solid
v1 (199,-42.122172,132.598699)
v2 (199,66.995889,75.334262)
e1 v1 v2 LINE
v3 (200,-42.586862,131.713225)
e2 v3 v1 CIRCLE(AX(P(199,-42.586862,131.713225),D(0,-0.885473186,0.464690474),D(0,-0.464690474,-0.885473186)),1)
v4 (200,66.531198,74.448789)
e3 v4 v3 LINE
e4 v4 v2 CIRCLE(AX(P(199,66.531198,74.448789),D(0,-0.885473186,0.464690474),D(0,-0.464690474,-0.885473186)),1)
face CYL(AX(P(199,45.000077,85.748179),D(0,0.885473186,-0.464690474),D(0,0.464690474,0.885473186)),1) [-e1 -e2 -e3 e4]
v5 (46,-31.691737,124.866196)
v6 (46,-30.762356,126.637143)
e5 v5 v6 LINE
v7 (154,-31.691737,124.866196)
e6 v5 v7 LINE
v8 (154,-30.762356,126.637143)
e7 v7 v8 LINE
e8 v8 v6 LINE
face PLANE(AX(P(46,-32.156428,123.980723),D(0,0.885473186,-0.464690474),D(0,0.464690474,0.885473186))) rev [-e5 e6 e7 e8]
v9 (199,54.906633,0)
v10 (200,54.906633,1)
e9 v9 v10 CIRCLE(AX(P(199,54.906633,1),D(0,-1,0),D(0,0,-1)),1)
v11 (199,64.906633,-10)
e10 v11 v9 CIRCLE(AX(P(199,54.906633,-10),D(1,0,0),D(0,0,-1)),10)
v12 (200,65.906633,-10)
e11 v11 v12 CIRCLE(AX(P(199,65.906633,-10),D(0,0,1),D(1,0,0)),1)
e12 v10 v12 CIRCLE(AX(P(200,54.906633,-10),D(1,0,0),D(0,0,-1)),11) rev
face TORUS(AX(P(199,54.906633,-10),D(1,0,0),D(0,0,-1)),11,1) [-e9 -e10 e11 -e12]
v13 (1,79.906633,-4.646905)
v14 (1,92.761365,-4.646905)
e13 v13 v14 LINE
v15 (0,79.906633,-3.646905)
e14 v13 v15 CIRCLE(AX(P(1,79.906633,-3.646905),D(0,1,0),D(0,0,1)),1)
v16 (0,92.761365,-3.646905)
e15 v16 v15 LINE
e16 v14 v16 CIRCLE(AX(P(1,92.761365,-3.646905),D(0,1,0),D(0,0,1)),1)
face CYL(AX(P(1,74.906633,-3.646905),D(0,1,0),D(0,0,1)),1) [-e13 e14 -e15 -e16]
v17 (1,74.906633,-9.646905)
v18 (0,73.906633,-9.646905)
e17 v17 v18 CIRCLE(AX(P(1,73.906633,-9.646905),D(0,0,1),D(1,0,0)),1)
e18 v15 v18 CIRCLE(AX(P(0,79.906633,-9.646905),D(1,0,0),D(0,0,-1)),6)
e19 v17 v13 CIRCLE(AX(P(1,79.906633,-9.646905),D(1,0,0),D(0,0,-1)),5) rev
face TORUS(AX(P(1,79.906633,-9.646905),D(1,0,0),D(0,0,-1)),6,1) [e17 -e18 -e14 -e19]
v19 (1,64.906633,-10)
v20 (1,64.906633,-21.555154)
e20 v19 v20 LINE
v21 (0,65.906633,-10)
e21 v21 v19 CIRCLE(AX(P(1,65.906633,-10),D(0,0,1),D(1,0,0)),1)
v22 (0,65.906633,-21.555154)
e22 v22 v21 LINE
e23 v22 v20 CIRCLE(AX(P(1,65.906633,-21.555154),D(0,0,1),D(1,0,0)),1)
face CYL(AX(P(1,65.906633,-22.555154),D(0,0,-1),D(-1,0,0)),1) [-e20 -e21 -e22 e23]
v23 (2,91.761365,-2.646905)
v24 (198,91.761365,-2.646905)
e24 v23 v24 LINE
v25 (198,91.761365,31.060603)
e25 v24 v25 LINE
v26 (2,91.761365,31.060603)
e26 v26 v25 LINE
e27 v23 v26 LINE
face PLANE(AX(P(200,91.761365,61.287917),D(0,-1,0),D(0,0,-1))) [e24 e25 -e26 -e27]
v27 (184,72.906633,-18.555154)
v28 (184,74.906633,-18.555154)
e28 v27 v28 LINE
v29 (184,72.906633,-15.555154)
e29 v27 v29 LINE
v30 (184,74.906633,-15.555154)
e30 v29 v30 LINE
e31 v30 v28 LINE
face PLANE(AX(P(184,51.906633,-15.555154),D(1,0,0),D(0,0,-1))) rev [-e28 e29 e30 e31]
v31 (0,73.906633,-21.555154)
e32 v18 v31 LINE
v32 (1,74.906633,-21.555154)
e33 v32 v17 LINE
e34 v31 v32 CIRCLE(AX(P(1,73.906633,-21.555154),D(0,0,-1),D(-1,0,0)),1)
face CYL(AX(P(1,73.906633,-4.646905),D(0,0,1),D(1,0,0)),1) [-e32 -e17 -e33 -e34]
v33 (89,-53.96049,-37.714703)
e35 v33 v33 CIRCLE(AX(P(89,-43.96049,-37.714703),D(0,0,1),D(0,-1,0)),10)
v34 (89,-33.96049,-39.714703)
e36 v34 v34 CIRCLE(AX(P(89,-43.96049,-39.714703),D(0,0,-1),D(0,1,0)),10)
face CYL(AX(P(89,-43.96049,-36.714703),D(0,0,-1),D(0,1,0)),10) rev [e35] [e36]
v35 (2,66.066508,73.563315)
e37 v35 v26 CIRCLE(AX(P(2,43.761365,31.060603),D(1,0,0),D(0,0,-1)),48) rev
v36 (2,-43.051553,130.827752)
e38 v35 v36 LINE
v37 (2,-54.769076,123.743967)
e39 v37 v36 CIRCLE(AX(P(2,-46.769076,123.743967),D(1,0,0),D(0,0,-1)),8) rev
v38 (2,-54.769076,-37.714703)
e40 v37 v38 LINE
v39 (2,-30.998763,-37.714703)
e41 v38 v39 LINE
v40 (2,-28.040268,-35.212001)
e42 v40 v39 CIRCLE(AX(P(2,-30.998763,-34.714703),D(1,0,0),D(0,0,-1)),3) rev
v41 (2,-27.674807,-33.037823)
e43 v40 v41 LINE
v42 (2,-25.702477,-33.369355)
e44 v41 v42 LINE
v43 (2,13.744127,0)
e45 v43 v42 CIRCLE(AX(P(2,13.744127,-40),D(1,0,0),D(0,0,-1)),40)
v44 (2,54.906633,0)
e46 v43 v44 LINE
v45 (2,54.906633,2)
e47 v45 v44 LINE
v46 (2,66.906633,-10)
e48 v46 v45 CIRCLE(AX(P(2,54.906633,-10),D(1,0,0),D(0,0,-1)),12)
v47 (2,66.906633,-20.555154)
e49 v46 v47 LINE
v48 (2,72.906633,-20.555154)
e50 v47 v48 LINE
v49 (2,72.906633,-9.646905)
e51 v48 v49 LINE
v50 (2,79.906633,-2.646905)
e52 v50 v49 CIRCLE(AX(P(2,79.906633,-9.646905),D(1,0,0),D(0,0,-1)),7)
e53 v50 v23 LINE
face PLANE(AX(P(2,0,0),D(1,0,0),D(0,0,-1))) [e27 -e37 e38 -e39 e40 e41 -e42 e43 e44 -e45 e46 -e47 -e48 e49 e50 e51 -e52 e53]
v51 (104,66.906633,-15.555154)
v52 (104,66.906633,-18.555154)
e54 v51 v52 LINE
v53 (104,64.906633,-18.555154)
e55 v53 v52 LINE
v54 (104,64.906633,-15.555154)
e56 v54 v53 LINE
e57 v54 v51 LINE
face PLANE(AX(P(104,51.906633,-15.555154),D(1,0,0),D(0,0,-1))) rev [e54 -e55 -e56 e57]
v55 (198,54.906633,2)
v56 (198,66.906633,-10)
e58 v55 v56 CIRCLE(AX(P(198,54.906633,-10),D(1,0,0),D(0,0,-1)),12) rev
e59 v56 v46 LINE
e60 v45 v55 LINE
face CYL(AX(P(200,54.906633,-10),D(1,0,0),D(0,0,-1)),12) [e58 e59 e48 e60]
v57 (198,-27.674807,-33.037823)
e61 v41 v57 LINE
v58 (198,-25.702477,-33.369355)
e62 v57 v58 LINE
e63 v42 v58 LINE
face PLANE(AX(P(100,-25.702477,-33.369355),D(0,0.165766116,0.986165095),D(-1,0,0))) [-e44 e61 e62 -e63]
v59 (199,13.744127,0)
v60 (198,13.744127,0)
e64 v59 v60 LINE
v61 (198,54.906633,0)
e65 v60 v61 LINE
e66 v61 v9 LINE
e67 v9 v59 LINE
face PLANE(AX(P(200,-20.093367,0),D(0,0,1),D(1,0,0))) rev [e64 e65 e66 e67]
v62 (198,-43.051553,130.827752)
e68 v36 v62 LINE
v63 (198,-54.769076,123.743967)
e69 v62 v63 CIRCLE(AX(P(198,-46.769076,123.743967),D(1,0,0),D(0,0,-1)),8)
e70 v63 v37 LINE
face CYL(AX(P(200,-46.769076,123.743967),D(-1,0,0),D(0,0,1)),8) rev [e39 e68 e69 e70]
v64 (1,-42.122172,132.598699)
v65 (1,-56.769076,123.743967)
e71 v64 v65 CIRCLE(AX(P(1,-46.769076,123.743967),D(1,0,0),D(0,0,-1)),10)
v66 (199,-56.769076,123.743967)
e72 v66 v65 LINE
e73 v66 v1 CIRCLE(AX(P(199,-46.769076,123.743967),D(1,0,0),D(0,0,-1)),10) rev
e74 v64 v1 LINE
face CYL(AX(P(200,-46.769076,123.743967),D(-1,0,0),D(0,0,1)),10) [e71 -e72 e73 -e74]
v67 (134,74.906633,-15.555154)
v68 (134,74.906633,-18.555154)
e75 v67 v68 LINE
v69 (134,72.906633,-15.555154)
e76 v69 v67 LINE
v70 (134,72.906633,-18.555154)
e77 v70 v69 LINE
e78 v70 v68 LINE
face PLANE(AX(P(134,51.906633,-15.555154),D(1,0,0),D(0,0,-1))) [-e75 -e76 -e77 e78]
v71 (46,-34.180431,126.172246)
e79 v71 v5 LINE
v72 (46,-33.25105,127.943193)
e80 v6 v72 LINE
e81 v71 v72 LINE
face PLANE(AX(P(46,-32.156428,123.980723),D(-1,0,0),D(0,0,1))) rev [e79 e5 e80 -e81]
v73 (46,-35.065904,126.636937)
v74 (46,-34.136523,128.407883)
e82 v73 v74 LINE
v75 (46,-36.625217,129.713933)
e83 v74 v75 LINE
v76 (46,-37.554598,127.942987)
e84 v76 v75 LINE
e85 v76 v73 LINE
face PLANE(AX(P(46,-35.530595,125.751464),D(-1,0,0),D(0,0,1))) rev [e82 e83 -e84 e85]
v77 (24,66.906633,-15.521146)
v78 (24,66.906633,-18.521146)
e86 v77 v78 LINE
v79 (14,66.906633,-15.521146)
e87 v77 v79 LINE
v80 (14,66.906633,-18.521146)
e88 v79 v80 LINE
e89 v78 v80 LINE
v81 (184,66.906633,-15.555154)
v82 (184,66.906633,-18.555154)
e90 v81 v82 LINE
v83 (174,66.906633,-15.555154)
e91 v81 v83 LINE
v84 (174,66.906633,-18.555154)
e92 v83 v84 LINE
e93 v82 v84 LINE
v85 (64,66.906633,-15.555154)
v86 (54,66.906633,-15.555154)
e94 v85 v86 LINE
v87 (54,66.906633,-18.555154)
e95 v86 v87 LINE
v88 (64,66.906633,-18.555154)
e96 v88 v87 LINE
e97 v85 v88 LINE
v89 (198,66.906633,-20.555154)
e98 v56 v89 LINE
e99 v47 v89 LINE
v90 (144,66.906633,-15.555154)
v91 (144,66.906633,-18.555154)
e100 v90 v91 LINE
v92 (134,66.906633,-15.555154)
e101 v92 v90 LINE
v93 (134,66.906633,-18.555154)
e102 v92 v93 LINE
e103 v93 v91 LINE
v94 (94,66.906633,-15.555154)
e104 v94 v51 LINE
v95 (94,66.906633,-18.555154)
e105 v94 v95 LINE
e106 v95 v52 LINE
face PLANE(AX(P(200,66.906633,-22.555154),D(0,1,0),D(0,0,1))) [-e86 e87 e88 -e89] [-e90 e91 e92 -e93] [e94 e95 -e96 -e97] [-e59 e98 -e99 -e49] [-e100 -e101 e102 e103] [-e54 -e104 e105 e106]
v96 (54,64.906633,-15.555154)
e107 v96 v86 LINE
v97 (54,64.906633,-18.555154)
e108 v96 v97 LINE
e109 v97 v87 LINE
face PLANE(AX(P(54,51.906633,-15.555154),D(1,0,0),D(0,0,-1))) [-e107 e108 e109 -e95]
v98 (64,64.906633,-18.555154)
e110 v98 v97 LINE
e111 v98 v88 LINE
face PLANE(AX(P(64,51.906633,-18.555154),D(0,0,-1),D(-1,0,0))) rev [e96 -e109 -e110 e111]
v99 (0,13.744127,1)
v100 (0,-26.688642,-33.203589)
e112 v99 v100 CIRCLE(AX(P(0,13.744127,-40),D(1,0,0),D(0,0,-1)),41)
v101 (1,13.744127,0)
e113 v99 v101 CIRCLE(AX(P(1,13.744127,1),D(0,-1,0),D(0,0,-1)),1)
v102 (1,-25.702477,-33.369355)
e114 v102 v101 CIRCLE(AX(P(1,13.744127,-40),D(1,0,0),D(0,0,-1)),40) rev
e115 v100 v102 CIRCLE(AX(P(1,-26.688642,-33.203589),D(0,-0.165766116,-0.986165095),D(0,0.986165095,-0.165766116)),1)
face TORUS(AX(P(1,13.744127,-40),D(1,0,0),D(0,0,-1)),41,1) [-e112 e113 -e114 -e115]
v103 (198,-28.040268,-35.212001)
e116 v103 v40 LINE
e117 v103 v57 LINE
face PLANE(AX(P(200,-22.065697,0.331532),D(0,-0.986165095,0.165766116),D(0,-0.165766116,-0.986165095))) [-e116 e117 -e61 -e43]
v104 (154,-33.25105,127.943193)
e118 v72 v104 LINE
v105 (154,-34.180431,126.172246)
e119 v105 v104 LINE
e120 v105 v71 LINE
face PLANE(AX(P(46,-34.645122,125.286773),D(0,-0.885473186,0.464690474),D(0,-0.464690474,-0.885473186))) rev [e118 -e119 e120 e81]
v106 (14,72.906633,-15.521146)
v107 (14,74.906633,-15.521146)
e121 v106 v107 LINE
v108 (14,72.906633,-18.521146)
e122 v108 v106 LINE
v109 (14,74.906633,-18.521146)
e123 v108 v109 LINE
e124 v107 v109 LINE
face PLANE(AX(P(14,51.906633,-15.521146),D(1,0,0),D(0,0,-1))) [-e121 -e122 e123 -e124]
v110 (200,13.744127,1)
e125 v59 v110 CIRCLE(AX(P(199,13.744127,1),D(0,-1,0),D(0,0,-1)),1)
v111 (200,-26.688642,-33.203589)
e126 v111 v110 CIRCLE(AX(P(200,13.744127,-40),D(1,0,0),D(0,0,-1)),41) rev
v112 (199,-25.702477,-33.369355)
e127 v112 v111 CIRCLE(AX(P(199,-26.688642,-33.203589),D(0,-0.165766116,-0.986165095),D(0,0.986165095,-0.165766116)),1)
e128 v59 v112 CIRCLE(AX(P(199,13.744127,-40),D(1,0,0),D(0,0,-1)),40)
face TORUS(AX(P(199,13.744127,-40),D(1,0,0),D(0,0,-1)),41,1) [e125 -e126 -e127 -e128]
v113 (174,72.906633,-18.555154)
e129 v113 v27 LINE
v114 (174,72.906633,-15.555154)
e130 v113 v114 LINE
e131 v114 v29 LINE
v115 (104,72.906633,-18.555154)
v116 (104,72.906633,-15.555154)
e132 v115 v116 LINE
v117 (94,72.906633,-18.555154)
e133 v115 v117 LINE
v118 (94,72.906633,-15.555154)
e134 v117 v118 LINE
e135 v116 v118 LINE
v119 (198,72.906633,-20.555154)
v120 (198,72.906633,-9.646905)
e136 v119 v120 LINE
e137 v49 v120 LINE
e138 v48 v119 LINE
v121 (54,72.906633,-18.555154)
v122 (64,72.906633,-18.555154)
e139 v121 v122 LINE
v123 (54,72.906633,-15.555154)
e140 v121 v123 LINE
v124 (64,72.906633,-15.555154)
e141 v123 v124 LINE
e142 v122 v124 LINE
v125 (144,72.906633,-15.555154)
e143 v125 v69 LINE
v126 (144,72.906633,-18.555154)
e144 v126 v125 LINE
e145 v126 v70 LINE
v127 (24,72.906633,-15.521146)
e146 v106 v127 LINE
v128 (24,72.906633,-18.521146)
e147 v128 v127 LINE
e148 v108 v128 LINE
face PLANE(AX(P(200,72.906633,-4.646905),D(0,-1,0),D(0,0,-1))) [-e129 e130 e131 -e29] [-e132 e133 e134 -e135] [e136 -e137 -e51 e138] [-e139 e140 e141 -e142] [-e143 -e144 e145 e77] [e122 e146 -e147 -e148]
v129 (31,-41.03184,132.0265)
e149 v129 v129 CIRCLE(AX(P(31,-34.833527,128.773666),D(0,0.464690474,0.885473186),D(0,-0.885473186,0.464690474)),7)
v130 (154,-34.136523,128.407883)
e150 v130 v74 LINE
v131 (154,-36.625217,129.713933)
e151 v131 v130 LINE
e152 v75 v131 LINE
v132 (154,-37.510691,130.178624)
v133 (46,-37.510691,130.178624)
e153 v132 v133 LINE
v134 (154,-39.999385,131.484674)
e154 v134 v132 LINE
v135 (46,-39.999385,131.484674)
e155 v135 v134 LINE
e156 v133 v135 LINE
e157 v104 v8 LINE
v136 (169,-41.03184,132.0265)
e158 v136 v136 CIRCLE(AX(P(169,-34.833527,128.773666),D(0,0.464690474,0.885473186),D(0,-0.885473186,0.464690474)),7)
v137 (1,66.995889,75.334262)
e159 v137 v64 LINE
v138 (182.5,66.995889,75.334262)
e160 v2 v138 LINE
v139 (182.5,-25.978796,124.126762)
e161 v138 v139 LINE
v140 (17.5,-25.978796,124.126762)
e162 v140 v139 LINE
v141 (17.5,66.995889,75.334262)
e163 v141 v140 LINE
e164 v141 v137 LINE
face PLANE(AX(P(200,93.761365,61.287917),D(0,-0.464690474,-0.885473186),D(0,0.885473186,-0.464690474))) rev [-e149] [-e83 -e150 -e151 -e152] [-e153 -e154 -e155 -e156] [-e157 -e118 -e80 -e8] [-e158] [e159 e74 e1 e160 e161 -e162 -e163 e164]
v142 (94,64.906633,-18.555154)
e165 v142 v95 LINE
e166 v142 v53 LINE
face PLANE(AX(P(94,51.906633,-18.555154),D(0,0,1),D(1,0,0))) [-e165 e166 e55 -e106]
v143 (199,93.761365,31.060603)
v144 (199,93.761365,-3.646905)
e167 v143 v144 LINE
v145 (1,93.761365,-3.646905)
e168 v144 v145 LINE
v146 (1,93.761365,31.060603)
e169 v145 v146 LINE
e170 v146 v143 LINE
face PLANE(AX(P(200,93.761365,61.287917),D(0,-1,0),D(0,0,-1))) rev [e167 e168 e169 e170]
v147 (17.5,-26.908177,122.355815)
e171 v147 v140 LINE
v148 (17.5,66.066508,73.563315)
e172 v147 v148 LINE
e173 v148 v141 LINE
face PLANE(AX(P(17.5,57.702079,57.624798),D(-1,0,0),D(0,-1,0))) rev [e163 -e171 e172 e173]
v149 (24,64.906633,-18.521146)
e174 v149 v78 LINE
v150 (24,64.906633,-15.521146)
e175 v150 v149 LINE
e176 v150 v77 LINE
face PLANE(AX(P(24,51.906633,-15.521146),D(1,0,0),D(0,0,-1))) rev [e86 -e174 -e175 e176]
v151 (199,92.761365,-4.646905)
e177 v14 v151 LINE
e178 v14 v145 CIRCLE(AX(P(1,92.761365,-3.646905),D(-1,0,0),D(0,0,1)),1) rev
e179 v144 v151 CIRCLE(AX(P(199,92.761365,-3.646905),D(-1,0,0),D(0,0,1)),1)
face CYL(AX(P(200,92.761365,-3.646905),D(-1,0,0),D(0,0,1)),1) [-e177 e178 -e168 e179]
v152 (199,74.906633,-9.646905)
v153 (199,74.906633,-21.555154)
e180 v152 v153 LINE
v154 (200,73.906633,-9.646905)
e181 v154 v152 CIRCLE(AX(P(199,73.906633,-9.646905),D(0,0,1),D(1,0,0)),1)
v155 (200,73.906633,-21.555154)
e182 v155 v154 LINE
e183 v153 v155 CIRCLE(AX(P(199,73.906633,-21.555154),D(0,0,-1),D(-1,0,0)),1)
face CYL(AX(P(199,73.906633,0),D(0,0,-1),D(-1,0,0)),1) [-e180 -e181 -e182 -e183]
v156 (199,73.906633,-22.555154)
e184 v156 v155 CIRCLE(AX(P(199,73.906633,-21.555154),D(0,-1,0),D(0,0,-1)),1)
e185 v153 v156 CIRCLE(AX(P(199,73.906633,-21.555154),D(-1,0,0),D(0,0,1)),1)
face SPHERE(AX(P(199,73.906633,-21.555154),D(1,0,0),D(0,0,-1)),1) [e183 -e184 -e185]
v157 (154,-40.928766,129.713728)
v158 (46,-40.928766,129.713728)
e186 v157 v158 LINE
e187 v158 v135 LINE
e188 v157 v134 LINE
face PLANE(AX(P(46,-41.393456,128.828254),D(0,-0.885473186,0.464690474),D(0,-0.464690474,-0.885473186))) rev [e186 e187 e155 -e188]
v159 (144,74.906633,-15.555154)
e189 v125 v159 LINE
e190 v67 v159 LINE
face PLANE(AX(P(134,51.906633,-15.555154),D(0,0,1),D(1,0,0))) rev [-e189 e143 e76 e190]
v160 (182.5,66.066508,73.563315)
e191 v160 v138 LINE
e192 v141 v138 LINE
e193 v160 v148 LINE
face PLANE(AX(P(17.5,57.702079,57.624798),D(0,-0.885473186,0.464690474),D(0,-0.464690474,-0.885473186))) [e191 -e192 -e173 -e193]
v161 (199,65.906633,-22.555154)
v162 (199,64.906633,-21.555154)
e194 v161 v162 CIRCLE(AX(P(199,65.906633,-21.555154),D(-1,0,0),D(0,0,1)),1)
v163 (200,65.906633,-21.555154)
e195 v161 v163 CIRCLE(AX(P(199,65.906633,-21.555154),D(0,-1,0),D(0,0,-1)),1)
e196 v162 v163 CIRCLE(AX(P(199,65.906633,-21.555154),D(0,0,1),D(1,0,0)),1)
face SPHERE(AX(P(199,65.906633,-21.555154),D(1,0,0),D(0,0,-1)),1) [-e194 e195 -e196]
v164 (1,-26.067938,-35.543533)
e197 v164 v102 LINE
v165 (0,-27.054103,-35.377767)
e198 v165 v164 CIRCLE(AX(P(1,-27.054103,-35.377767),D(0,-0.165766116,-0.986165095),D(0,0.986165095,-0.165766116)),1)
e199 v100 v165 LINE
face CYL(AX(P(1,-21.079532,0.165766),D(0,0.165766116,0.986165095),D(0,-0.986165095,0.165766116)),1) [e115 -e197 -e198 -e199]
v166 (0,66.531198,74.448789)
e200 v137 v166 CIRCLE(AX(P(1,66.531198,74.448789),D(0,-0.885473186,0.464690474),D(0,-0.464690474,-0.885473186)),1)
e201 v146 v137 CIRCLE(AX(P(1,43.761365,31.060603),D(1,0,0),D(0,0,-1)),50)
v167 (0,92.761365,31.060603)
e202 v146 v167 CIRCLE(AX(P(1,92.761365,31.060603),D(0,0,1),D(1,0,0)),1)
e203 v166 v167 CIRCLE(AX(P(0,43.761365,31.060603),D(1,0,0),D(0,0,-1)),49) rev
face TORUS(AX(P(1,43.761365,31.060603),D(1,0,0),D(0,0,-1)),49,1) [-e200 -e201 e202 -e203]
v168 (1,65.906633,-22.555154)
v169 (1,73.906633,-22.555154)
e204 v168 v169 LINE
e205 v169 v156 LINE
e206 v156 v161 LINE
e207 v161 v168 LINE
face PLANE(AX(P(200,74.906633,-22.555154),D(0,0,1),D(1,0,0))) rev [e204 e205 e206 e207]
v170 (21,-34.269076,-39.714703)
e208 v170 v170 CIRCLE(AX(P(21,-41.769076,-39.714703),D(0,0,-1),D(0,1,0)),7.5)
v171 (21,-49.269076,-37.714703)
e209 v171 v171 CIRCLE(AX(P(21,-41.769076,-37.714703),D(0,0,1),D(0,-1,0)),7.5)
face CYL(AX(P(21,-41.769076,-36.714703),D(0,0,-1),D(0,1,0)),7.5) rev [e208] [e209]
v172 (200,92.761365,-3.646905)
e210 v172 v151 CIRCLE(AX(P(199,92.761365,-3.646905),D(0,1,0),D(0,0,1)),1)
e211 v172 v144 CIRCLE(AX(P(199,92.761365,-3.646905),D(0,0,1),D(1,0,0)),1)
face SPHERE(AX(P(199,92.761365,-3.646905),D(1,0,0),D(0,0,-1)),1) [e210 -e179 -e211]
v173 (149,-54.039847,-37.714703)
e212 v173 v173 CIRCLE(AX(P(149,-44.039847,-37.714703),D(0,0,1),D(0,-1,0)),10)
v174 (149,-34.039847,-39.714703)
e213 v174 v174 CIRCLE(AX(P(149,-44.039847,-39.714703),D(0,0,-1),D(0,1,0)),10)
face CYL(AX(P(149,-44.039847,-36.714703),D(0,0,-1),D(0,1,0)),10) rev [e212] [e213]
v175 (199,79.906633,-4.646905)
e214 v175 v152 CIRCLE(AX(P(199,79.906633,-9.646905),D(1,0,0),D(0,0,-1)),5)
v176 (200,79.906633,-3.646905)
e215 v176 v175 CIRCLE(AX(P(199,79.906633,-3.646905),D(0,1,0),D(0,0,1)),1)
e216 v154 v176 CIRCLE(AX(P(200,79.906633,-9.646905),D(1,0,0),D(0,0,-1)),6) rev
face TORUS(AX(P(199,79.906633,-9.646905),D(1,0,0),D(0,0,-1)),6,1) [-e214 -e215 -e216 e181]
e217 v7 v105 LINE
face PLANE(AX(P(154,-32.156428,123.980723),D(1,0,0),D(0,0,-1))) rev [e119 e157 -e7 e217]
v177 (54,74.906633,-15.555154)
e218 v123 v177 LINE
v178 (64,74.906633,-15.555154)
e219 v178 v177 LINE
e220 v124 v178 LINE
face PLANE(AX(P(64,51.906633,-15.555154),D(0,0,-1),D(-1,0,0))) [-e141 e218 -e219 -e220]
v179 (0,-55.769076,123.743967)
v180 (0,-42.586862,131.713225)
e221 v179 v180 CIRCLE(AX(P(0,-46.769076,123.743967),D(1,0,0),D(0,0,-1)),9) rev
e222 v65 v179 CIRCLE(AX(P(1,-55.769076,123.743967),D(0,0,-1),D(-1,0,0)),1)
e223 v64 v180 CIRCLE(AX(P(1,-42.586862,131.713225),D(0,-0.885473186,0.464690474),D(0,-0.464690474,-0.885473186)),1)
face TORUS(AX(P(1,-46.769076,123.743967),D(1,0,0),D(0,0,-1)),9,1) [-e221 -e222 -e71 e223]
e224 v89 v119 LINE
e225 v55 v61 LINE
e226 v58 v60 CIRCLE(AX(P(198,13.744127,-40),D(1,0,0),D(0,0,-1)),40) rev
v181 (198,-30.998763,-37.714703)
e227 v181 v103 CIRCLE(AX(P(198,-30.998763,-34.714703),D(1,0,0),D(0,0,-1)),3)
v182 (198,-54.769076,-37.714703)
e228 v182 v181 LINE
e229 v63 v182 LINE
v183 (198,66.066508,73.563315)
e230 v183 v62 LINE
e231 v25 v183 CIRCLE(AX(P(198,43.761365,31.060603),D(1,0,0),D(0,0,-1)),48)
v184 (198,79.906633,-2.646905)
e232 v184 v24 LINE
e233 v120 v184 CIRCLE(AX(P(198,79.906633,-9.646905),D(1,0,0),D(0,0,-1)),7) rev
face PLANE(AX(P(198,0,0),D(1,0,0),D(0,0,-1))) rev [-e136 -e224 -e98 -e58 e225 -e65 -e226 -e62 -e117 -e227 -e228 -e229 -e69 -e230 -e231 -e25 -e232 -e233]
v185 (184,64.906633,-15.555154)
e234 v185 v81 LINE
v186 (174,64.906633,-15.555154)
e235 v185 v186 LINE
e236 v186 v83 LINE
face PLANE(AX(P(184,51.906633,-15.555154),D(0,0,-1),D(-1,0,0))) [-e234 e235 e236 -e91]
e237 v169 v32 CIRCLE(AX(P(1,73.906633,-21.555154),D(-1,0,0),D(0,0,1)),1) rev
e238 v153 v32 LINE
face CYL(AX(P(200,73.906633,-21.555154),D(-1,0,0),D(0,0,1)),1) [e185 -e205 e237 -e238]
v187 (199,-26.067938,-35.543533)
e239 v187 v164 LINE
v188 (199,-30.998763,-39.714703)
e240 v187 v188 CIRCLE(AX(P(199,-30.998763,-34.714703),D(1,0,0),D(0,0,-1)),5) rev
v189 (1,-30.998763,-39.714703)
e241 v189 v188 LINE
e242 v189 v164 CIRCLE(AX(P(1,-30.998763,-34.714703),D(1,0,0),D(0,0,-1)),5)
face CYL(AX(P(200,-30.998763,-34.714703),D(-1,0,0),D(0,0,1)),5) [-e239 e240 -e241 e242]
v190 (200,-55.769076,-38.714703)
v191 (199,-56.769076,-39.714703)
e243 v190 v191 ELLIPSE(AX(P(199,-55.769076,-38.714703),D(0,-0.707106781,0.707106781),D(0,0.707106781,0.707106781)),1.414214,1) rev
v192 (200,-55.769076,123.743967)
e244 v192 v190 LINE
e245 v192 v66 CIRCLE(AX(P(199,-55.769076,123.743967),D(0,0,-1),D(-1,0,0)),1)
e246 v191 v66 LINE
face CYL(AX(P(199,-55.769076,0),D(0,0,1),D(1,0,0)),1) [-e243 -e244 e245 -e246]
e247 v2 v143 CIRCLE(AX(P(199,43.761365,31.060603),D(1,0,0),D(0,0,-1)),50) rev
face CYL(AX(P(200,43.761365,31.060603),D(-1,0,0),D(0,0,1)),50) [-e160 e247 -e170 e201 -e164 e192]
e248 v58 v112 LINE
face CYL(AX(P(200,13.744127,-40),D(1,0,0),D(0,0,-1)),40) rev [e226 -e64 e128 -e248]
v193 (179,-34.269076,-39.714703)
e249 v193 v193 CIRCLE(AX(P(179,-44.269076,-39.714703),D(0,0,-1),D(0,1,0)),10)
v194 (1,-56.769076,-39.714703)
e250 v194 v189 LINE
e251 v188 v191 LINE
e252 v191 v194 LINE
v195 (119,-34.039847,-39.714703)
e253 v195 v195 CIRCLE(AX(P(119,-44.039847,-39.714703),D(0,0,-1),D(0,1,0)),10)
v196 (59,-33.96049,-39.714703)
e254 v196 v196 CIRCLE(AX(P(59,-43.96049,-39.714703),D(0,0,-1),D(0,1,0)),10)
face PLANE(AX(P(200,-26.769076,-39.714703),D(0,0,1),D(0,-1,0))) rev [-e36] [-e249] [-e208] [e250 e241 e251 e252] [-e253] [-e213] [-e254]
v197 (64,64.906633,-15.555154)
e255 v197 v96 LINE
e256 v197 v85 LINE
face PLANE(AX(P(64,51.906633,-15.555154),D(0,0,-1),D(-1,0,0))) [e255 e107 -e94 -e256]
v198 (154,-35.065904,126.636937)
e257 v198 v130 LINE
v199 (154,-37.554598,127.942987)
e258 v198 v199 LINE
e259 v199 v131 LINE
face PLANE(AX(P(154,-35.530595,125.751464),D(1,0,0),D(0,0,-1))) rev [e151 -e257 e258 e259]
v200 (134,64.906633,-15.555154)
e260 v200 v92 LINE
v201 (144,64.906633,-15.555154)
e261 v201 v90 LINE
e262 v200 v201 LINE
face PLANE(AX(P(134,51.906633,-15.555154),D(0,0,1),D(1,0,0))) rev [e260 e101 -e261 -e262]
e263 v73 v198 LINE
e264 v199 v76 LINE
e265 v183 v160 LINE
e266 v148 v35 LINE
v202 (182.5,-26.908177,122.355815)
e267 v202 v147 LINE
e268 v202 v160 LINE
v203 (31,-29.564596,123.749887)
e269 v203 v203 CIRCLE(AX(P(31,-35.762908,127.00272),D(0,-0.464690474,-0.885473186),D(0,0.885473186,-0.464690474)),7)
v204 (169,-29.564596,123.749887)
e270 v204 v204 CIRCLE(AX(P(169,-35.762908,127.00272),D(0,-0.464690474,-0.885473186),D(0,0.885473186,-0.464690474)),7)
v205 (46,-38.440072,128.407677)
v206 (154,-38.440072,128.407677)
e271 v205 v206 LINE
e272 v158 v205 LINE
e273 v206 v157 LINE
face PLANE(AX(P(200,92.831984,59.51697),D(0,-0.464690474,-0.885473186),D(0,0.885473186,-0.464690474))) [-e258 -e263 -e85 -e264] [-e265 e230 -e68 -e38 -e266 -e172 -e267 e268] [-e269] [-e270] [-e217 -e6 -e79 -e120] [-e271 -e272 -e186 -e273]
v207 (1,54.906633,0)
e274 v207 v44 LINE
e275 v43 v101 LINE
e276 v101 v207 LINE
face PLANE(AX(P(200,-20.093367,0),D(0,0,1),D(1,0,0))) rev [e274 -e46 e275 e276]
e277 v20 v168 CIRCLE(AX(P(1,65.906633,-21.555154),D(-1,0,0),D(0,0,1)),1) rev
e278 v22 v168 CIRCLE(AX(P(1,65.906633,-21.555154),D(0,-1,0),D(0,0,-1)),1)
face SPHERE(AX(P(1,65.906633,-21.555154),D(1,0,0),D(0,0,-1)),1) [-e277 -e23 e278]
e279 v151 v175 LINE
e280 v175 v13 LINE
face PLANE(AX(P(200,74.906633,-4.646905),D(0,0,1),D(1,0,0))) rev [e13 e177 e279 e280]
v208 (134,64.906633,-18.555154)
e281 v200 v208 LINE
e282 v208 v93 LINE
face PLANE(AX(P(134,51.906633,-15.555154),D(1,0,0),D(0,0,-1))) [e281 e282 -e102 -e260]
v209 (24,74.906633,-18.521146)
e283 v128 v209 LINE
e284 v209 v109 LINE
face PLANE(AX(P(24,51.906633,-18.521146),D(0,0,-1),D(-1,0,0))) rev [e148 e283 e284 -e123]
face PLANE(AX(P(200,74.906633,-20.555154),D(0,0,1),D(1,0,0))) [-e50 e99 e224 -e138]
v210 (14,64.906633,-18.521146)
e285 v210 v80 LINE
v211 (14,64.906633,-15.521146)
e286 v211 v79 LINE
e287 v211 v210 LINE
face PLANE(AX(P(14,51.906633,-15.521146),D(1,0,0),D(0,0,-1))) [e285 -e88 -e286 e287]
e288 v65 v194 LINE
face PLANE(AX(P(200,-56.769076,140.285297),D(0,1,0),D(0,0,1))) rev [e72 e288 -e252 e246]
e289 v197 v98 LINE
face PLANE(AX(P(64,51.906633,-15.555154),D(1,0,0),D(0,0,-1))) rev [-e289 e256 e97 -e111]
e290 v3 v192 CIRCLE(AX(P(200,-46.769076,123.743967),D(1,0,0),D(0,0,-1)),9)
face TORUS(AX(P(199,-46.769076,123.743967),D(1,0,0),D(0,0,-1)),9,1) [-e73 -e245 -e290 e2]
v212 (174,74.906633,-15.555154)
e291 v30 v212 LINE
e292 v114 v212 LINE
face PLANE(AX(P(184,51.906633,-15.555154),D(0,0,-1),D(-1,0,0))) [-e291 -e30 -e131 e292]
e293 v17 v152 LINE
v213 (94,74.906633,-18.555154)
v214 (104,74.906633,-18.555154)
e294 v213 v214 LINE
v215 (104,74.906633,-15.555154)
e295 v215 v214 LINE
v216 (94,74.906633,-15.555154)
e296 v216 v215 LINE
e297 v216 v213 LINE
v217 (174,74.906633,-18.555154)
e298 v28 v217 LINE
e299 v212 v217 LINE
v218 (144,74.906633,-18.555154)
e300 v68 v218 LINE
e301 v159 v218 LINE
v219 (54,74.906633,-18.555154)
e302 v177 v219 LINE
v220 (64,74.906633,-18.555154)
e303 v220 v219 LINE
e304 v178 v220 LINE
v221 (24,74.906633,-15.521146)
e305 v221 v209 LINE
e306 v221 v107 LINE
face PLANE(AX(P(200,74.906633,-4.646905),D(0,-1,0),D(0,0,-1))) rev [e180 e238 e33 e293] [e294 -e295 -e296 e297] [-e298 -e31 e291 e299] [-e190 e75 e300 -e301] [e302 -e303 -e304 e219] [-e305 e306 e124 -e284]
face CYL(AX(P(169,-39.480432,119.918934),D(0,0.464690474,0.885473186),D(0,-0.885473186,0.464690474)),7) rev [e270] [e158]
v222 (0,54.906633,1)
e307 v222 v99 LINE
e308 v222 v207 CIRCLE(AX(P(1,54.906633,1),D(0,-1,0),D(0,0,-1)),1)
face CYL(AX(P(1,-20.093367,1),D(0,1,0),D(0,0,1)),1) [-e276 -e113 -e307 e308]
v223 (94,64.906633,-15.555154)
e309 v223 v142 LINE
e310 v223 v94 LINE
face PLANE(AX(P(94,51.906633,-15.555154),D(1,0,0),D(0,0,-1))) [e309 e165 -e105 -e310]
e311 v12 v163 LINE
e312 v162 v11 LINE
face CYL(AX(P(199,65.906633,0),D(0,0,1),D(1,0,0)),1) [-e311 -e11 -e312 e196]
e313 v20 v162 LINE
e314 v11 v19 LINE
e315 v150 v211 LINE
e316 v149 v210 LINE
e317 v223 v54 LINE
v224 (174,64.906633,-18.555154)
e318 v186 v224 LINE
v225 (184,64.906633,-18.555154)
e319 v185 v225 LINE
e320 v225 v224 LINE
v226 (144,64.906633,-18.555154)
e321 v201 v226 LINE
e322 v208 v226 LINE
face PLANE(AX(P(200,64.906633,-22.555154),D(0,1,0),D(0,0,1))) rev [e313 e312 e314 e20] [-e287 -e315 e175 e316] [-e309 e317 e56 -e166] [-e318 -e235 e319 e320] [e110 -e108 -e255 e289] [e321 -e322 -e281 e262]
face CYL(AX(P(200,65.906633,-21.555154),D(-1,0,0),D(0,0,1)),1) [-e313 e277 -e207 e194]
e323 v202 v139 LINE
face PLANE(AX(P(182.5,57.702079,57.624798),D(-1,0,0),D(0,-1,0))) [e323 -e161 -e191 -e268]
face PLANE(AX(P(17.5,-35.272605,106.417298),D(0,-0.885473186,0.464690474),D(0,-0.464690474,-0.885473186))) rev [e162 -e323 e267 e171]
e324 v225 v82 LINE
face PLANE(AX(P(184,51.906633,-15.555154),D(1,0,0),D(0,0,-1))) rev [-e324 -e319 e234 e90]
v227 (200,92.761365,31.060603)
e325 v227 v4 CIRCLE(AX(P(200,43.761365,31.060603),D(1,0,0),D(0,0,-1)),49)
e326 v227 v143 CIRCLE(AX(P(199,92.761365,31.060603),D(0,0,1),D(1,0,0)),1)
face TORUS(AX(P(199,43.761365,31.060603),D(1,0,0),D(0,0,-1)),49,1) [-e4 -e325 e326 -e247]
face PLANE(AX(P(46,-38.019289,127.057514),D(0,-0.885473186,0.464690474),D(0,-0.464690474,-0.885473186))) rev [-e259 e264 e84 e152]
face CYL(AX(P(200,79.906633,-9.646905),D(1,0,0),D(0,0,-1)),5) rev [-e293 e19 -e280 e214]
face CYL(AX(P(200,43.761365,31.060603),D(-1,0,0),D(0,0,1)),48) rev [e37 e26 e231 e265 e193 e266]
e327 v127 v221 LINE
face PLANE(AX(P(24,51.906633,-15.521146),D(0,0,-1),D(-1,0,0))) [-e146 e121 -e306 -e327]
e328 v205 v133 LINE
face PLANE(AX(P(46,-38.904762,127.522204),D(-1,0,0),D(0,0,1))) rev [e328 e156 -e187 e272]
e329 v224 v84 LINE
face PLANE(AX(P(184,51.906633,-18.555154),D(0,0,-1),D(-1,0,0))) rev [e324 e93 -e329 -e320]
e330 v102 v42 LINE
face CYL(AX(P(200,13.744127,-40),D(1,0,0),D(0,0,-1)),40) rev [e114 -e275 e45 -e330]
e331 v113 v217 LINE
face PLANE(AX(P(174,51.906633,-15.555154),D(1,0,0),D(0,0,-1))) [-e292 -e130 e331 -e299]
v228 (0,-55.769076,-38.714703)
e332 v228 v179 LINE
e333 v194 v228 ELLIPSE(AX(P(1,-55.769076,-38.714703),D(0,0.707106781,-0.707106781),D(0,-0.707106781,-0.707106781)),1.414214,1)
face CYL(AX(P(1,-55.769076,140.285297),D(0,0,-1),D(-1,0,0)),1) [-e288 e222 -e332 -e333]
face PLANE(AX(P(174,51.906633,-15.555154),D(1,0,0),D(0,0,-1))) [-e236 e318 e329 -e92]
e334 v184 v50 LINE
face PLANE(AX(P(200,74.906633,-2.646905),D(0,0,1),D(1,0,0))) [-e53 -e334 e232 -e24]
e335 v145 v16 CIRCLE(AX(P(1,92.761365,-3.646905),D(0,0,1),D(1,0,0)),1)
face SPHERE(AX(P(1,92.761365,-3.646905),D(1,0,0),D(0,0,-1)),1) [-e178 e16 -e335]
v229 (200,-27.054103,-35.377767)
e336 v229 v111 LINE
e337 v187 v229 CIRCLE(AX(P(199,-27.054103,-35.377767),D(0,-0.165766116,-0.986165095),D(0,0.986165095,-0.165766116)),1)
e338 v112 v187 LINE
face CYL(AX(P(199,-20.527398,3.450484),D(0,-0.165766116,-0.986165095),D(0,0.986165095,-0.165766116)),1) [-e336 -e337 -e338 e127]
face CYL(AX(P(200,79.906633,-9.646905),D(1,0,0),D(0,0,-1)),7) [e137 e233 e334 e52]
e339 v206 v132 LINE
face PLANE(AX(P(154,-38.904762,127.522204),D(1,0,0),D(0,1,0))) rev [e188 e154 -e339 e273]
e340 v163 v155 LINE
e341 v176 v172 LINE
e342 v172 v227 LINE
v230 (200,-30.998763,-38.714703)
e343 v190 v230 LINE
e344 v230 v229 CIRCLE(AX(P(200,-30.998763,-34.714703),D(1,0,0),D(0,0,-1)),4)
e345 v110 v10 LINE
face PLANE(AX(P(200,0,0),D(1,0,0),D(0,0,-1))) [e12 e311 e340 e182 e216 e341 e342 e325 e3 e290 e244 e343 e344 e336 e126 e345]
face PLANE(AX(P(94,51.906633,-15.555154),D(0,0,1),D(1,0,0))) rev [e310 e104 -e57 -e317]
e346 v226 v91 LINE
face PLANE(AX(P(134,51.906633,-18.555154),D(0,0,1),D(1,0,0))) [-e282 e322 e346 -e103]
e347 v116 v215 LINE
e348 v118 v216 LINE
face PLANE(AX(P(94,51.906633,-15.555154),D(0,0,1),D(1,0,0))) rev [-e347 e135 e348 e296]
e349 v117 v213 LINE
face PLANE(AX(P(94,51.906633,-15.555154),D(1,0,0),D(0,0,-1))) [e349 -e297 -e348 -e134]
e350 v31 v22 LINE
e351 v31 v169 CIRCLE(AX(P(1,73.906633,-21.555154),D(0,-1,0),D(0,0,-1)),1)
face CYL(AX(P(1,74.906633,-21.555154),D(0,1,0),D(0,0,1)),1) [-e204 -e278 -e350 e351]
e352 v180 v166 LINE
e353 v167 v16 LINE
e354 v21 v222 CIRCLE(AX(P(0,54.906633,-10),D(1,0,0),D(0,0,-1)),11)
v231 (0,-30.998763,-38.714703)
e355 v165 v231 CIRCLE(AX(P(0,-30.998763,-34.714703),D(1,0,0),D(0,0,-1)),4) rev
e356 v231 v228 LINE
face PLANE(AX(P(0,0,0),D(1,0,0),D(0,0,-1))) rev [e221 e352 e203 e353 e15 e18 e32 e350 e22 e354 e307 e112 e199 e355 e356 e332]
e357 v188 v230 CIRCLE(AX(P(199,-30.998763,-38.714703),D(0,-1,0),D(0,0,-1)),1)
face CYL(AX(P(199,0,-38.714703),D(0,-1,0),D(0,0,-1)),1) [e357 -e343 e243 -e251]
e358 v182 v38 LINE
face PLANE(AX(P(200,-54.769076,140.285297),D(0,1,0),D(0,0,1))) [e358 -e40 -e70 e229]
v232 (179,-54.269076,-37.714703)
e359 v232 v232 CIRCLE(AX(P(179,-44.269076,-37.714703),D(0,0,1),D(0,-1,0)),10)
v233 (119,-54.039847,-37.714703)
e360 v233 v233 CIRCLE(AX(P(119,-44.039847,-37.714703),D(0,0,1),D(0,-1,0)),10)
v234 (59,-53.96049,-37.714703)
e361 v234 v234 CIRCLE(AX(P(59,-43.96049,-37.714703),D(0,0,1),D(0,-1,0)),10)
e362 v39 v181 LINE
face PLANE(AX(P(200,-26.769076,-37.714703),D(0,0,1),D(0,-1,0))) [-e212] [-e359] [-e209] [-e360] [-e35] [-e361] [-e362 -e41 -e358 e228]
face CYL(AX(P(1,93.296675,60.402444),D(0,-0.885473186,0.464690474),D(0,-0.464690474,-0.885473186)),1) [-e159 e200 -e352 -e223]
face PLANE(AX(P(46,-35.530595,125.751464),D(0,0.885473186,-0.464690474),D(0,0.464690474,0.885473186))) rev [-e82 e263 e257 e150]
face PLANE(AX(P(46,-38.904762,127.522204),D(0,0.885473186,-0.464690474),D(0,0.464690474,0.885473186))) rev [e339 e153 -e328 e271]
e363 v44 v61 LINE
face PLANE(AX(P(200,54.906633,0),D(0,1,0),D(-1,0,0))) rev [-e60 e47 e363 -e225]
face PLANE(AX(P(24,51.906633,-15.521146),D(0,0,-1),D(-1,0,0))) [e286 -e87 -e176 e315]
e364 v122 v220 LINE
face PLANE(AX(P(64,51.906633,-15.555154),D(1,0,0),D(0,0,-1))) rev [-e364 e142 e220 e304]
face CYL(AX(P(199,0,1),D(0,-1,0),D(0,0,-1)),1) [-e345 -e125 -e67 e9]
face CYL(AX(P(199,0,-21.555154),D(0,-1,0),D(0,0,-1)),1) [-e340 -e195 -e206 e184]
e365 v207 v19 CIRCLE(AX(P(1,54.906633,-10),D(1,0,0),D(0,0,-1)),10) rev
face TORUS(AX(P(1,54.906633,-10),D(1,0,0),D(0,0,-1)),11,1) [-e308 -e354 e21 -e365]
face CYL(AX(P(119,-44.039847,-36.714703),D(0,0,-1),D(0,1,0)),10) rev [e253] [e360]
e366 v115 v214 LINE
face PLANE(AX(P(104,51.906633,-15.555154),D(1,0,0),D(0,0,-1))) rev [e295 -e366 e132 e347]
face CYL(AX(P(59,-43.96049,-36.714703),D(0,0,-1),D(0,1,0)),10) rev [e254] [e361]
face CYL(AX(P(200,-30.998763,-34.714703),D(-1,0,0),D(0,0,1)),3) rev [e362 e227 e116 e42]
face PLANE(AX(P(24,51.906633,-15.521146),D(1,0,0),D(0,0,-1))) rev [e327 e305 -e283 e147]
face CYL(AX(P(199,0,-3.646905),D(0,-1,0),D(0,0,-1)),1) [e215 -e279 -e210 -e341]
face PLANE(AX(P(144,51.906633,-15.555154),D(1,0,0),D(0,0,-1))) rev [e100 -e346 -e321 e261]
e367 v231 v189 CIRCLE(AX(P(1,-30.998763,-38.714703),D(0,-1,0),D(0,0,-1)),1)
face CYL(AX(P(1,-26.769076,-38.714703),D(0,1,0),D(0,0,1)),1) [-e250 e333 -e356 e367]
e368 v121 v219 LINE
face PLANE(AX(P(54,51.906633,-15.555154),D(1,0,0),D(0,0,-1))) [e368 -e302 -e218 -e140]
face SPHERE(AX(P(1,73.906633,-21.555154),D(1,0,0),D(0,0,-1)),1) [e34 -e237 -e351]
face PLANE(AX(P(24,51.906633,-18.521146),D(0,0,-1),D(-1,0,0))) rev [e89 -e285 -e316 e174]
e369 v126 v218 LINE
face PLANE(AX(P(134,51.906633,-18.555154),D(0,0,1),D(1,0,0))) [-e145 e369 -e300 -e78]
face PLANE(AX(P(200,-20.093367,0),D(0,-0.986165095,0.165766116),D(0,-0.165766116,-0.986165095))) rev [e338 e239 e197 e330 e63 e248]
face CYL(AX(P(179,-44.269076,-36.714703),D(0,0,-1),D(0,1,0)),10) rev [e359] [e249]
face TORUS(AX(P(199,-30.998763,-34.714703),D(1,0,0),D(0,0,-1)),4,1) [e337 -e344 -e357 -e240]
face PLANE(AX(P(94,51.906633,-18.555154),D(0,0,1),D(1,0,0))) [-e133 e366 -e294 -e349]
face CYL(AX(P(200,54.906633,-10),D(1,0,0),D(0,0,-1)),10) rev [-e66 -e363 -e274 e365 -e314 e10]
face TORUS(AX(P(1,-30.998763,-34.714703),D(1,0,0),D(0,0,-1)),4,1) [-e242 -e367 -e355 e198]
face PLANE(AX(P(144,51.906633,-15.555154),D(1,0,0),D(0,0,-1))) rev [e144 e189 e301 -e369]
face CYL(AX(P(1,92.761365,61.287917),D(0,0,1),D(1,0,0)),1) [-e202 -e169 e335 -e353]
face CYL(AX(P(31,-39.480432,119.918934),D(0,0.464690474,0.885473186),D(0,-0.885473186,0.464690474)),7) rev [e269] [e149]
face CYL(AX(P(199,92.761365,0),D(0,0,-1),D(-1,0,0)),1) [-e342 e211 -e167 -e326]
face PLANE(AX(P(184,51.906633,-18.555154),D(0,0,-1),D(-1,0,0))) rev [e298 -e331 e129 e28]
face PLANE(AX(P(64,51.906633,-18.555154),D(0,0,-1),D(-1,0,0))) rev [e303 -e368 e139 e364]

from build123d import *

# Parameters (mm, degrees)
BOSS_EXTRUDE1_DEPTH = 200
FILLET1_R           = 50
FILLET2_R           = 10
FILLET3_R           = 40
FILLET4_R           = 5
FILLET5_R           = 5
FILLET6_R           = 1
FILLET7_R           = 1
FILLET8_R           = 1
FILLET10_R          = 10
SHELL3_START        = 2
SHELL3_DEPTH        = 196
FILLET14_R          = 1
FILLET15_R          = 1
SKETCH5_W           = 165
SKETCH5_H           = 105
CUT_EXTRUDE1_DEPTH  = 20
SKETCH6_W           = 10
SKETCH6_H           = 3
CUT_EXTRUDE4_DEPTH  = 23
SKETCH8_R           = 7
CUT_EXTRUDE6_DEPTH  = 10
SKETCH9_R           = 10
SKETCH9_R_2         = 7.5
CUT_EXTRUDE7_DEPTH  = 3
SKETCH10_W          = 108
SKETCH10_H          = 2.810580917
SKETCH10_H_2        = 2.810580918
CUT_EXTRUDE8_DEPTH  = 3


# Read off the part's stored shape, not the designer's step: Shell3
with BuildPart() as part:
    # Sketch3 → Boss-Extrude1 (new body)
    with BuildSketch(Plane(origin=(0, 0, 0), x_dir=(0, 0, -1), z_dir=(1, 0, 0))):
        Polygon((-61.287916817, 93.76136528), (-140.28529736, -56.769076383), (39.71470264, -56.769076383), (39.71470264, -26.769076383), (0, -20.093366582), (0, 64.906633418), (22.555153974, 64.906633418), (22.555153974, 74.906633418), (4.646904738, 74.906633418), (4.646904738, 93.76136528), align=None)
    extrude(amount=BOSS_EXTRUDE1_DEPTH)

    # Fillet1
    fillet1_edges = [part.edges().sort_by_distance(p)[0] for p in [
        (100, 93.76136528, 61.287916817),
    ]]
    fillet(fillet1_edges, radius=FILLET1_R)

    # Fillet2
    fillet2_edges = [part.edges().sort_by_distance(p)[0] for p in [
        (100, -56.769076383, 140.28529736),
    ]]
    fillet(fillet2_edges, radius=FILLET2_R)

    # Fillet3
    fillet3_edges = [part.edges().sort_by_distance(p)[0] for p in [
        (100, -20.093366582, 0),
    ]]
    fillet(fillet3_edges, radius=FILLET3_R)

    # Fillet4
    fillet4_edges = [part.edges().sort_by_distance(p)[0] for p in [
        (100, -26.769076383, -39.71470264),
    ]]
    fillet(fillet4_edges, radius=FILLET4_R)

    # Fillet5
    fillet5_edges = [part.edges().sort_by_distance(p)[0] for p in [
        (100, 74.906633418, -4.646904738),
    ]]
    fillet(fillet5_edges, radius=FILLET5_R)

    # Fillet6
    fillet6_edges = [part.edges().sort_by_distance(p)[0] for p in [
        (100, 93.76136528, -4.646904738),
    ]]
    fillet(fillet6_edges, radius=FILLET6_R)

    # Fillet7
    fillet7_edges = [part.edges().sort_by_distance(p)[0] for p in [
        (100, 74.906633418, -22.555153974),
    ]]
    fillet(fillet7_edges, radius=FILLET7_R)

    # Fillet8
    fillet8_edges = [part.edges().sort_by_distance(p)[0] for p in [
        (100, 64.906633418, -22.555153974),
    ]]
    fillet(fillet8_edges, radius=FILLET8_R)

    # Fillet10
    fillet10_edges = [part.edges().sort_by_distance(p)[0] for p in [
        (100, 64.906633418, 0),
    ]]
    fillet(fillet10_edges, radius=FILLET10_R)

    # Shell3 outline → Shell3 (cut)
    with BuildSketch(Plane.YZ.offset(SHELL3_START)):
        with BuildLine():
            Line((-27.674806697, -33.037823142), (-25.702476507, -33.369355374))
            ThreePointArc((-25.702476507, -33.369355374), (-12.089709184, -9.461288624), (13.744127299, 0))
            Line((13.744127299, 0), (54.906633418, 0))
            Line((54.906633418, 0), (54.906633418, 2))
            ThreePointArc((54.906633418, 2), (63.391914792, -1.514718626), (66.906633418, -10))
            Line((66.906633418, -10), (66.906633418, -20.555153974))
            Line((66.906633418, -20.555153974), (72.906633418, -20.555153974))
            Line((72.906633418, -20.555153974), (72.906633418, -9.646904738))
            ThreePointArc((72.906633418, -9.646904738), (74.956885949, -4.697157269), (79.906633418, -2.646904738))
            Line((79.906633418, -2.646904738), (91.76136528, -2.646904738))
            Line((91.76136528, -2.646904738), (91.76136528, 31.060602511))
            ThreePointArc((91.76136528, 31.060602511), (84.838407844, 55.893576038), (66.066508022, 73.563315451))
            Line((66.066508022, 73.563315451), (-43.051552593, 130.82775222))
            ThreePointArc((-43.051552593, 130.82775222), (-50.907905305, 130.590140491), (-54.769076383, 123.74396673))
            Line((-54.769076383, 123.74396673), (-54.769076383, -37.71470264))
            Line((-54.769076383, -37.71470264), (-30.998763119, -37.71470264))
            ThreePointArc((-30.998763119, -37.71470264), (-29.061225382, -37.005105993), (-28.040267833, -35.212000987))
            Line((-28.040267833, -35.212000987), (-27.674806697, -33.037823142))
        make_face()
    extrude(amount=SHELL3_DEPTH, mode=Mode.SUBTRACT)

    # Fillet14
    fillet14_edges = [part.edges().sort_by_distance(p)[0] for p in [
        (200, -43.883919751, -39.71470264),
        (200, 12.436858662, 103.966480208),
        (200, 86.549951284, 56.928283268),
        (200, -56.769076383, 42.014632045),
        (200, -51.942612535, 132.301683931),
        (200, 34.325380359, 0),
        (200, -12.089709184, -9.461288624),
        (200, -25.885207075, -34.456444296),
        (200, -27.769533558, -38.532041562),
        (200, 86.333999349, -4.646904738),
        (200, 76.371099512, -6.111370832),
        (200, 93.76136528, 13.706848886),
        (200, 93.468472061, -4.354011519),
        (200, 74.906633418, -15.601029356),
        (200, 74.613740199, -22.262260756),
        (200, 69.906633418, -22.555153974),
        (200, 65.199526636, -22.262260756),
        (200, 64.906633418, -15.777576987),
        (200, 61.97770123, -2.928932188),
    ]]
    fillet(fillet14_edges, radius=FILLET14_R)

    # Fillet15
    fillet15_edges = [part.edges().sort_by_distance(p)[0] for p in [
        (0, -43.883919751, -39.71470264),
        (0, 12.436858662, 103.966480208),
        (0, 86.549951284, 56.928283268),
        (0, -56.769076383, 42.014632045),
        (0, -51.942612535, 132.301683931),
        (0, 34.325380359, 0),
        (0, -12.089709184, -9.461288624),
        (0, -25.885207075, -34.456444296),
        (0, -27.769533558, -38.532041562),
        (0, 86.333999349, -4.646904738),
        (0, 76.371099512, -6.111370832),
        (0, 93.76136528, 13.706848886),
        (0, 93.468472061, -4.354011519),
        (0, 74.906633418, -15.601029356),
        (0, 74.613740199, -22.262260756),
        (0, 69.906633418, -22.555153974),
        (0, 65.199526636, -22.262260756),
        (0, 64.906633418, -15.777576987),
        (0, 61.97770123, -2.928932188),
    ]]
    fillet(fillet15_edges, radius=FILLET15_R)

    # Sketch5 → Cut-Extrude1 (cut)
    with BuildSketch(Plane(origin=(0, 45.46476773, 86.633651895), x_dir=(1, 0, 0), z_dir=(0, 0.4646904737791423, 0.8854731862563182))):
        with Locations((100, -28.184050547)):
            Rectangle(SKETCH5_W, SKETCH5_H)
    extrude(amount=-CUT_EXTRUDE1_DEPTH, mode=Mode.SUBTRACT)

    # Sketch6 → Cut-Extrude4 (cut)
    with BuildSketch(Plane(origin=(0, 74.906633418, 0), x_dir=(1, 0, 0), z_dir=(0, 1, 0))):
        with Locations((179, 17.055153974)):
            Rectangle(SKETCH6_W, SKETCH6_H)
        with Locations((139, 17.055153974)):
            Rectangle(SKETCH6_W, SKETCH6_H)
        with Locations((99, 17.055153974)):
            Rectangle(SKETCH6_W, SKETCH6_H)
        with Locations((59, 17.055153974)):
            Rectangle(SKETCH6_W, SKETCH6_H)
        with Locations((19, 17.021146207)):
            Rectangle(SKETCH6_W, SKETCH6_H)
    extrude(amount=-CUT_EXTRUDE4_DEPTH, mode=Mode.SUBTRACT)

    # Sketch8 → Cut-Extrude6 (cut)
    with BuildSketch(Plane(origin=(0, 45.46476773, 86.633651895), x_dir=(1, 0, 0), z_dir=(0, 0.4646904737791423, 0.8854731862563182))):
        with Locations(Location((31, -90.684050547, 0), (0, 0, 270))):
            Circle(SKETCH8_R)
        with Locations(Location((169, -90.684050547, 0), (0, 0, 270))):
            Circle(SKETCH8_R)
    extrude(amount=-CUT_EXTRUDE6_DEPTH, mode=Mode.SUBTRACT)

    # Sketch9 → Cut-Extrude7 (cut)
    with BuildSketch(Plane(origin=(0, 0, -39.71470264), x_dir=(-1, 0, 0), z_dir=(0, 0, -1))):
        with Locations(Location((-179, -44.269076383, 0), (0, 0, 90))):
            Circle(SKETCH9_R)
        with Locations(Location((-149, -44.039846818, 0), (0, 0, 90))):
            Circle(SKETCH9_R)
        with Locations(Location((-119, -44.039846818, 0), (0, 0, 90))):
            Circle(SKETCH9_R)
        with Locations(Location((-89, -43.960489904, 0), (0, 0, 90))):
            Circle(SKETCH9_R)
        with Locations(Location((-59, -43.960489904, 0), (0, 0, 90))):
            Circle(SKETCH9_R)
        with Locations(Location((-21, -41.769076383, 0), (0, 0, 90))):
            Circle(SKETCH9_R_2)
    extrude(amount=-CUT_EXTRUDE7_DEPTH, mode=Mode.SUBTRACT)

    # Sketch10 → Cut-Extrude8 (cut)
    with BuildSketch(Plane(origin=(0, 45.46476773, 86.633651895), x_dir=(1, 0, 0), z_dir=(0, 0.46469047377914224, 0.8854731862563181))):
        with Locations((100, -87.49160573)):
            Rectangle(SKETCH10_W, SKETCH10_H)
        with Locations((100, -91.302186647)):
            Rectangle(SKETCH10_W, SKETCH10_H_2)
        with Locations((100, -95.112767565)):
            Rectangle(SKETCH10_W, SKETCH10_H_2)
    extrude(amount=-CUT_EXTRUDE8_DEPTH, mode=Mode.SUBTRACT)


solid = part.part
